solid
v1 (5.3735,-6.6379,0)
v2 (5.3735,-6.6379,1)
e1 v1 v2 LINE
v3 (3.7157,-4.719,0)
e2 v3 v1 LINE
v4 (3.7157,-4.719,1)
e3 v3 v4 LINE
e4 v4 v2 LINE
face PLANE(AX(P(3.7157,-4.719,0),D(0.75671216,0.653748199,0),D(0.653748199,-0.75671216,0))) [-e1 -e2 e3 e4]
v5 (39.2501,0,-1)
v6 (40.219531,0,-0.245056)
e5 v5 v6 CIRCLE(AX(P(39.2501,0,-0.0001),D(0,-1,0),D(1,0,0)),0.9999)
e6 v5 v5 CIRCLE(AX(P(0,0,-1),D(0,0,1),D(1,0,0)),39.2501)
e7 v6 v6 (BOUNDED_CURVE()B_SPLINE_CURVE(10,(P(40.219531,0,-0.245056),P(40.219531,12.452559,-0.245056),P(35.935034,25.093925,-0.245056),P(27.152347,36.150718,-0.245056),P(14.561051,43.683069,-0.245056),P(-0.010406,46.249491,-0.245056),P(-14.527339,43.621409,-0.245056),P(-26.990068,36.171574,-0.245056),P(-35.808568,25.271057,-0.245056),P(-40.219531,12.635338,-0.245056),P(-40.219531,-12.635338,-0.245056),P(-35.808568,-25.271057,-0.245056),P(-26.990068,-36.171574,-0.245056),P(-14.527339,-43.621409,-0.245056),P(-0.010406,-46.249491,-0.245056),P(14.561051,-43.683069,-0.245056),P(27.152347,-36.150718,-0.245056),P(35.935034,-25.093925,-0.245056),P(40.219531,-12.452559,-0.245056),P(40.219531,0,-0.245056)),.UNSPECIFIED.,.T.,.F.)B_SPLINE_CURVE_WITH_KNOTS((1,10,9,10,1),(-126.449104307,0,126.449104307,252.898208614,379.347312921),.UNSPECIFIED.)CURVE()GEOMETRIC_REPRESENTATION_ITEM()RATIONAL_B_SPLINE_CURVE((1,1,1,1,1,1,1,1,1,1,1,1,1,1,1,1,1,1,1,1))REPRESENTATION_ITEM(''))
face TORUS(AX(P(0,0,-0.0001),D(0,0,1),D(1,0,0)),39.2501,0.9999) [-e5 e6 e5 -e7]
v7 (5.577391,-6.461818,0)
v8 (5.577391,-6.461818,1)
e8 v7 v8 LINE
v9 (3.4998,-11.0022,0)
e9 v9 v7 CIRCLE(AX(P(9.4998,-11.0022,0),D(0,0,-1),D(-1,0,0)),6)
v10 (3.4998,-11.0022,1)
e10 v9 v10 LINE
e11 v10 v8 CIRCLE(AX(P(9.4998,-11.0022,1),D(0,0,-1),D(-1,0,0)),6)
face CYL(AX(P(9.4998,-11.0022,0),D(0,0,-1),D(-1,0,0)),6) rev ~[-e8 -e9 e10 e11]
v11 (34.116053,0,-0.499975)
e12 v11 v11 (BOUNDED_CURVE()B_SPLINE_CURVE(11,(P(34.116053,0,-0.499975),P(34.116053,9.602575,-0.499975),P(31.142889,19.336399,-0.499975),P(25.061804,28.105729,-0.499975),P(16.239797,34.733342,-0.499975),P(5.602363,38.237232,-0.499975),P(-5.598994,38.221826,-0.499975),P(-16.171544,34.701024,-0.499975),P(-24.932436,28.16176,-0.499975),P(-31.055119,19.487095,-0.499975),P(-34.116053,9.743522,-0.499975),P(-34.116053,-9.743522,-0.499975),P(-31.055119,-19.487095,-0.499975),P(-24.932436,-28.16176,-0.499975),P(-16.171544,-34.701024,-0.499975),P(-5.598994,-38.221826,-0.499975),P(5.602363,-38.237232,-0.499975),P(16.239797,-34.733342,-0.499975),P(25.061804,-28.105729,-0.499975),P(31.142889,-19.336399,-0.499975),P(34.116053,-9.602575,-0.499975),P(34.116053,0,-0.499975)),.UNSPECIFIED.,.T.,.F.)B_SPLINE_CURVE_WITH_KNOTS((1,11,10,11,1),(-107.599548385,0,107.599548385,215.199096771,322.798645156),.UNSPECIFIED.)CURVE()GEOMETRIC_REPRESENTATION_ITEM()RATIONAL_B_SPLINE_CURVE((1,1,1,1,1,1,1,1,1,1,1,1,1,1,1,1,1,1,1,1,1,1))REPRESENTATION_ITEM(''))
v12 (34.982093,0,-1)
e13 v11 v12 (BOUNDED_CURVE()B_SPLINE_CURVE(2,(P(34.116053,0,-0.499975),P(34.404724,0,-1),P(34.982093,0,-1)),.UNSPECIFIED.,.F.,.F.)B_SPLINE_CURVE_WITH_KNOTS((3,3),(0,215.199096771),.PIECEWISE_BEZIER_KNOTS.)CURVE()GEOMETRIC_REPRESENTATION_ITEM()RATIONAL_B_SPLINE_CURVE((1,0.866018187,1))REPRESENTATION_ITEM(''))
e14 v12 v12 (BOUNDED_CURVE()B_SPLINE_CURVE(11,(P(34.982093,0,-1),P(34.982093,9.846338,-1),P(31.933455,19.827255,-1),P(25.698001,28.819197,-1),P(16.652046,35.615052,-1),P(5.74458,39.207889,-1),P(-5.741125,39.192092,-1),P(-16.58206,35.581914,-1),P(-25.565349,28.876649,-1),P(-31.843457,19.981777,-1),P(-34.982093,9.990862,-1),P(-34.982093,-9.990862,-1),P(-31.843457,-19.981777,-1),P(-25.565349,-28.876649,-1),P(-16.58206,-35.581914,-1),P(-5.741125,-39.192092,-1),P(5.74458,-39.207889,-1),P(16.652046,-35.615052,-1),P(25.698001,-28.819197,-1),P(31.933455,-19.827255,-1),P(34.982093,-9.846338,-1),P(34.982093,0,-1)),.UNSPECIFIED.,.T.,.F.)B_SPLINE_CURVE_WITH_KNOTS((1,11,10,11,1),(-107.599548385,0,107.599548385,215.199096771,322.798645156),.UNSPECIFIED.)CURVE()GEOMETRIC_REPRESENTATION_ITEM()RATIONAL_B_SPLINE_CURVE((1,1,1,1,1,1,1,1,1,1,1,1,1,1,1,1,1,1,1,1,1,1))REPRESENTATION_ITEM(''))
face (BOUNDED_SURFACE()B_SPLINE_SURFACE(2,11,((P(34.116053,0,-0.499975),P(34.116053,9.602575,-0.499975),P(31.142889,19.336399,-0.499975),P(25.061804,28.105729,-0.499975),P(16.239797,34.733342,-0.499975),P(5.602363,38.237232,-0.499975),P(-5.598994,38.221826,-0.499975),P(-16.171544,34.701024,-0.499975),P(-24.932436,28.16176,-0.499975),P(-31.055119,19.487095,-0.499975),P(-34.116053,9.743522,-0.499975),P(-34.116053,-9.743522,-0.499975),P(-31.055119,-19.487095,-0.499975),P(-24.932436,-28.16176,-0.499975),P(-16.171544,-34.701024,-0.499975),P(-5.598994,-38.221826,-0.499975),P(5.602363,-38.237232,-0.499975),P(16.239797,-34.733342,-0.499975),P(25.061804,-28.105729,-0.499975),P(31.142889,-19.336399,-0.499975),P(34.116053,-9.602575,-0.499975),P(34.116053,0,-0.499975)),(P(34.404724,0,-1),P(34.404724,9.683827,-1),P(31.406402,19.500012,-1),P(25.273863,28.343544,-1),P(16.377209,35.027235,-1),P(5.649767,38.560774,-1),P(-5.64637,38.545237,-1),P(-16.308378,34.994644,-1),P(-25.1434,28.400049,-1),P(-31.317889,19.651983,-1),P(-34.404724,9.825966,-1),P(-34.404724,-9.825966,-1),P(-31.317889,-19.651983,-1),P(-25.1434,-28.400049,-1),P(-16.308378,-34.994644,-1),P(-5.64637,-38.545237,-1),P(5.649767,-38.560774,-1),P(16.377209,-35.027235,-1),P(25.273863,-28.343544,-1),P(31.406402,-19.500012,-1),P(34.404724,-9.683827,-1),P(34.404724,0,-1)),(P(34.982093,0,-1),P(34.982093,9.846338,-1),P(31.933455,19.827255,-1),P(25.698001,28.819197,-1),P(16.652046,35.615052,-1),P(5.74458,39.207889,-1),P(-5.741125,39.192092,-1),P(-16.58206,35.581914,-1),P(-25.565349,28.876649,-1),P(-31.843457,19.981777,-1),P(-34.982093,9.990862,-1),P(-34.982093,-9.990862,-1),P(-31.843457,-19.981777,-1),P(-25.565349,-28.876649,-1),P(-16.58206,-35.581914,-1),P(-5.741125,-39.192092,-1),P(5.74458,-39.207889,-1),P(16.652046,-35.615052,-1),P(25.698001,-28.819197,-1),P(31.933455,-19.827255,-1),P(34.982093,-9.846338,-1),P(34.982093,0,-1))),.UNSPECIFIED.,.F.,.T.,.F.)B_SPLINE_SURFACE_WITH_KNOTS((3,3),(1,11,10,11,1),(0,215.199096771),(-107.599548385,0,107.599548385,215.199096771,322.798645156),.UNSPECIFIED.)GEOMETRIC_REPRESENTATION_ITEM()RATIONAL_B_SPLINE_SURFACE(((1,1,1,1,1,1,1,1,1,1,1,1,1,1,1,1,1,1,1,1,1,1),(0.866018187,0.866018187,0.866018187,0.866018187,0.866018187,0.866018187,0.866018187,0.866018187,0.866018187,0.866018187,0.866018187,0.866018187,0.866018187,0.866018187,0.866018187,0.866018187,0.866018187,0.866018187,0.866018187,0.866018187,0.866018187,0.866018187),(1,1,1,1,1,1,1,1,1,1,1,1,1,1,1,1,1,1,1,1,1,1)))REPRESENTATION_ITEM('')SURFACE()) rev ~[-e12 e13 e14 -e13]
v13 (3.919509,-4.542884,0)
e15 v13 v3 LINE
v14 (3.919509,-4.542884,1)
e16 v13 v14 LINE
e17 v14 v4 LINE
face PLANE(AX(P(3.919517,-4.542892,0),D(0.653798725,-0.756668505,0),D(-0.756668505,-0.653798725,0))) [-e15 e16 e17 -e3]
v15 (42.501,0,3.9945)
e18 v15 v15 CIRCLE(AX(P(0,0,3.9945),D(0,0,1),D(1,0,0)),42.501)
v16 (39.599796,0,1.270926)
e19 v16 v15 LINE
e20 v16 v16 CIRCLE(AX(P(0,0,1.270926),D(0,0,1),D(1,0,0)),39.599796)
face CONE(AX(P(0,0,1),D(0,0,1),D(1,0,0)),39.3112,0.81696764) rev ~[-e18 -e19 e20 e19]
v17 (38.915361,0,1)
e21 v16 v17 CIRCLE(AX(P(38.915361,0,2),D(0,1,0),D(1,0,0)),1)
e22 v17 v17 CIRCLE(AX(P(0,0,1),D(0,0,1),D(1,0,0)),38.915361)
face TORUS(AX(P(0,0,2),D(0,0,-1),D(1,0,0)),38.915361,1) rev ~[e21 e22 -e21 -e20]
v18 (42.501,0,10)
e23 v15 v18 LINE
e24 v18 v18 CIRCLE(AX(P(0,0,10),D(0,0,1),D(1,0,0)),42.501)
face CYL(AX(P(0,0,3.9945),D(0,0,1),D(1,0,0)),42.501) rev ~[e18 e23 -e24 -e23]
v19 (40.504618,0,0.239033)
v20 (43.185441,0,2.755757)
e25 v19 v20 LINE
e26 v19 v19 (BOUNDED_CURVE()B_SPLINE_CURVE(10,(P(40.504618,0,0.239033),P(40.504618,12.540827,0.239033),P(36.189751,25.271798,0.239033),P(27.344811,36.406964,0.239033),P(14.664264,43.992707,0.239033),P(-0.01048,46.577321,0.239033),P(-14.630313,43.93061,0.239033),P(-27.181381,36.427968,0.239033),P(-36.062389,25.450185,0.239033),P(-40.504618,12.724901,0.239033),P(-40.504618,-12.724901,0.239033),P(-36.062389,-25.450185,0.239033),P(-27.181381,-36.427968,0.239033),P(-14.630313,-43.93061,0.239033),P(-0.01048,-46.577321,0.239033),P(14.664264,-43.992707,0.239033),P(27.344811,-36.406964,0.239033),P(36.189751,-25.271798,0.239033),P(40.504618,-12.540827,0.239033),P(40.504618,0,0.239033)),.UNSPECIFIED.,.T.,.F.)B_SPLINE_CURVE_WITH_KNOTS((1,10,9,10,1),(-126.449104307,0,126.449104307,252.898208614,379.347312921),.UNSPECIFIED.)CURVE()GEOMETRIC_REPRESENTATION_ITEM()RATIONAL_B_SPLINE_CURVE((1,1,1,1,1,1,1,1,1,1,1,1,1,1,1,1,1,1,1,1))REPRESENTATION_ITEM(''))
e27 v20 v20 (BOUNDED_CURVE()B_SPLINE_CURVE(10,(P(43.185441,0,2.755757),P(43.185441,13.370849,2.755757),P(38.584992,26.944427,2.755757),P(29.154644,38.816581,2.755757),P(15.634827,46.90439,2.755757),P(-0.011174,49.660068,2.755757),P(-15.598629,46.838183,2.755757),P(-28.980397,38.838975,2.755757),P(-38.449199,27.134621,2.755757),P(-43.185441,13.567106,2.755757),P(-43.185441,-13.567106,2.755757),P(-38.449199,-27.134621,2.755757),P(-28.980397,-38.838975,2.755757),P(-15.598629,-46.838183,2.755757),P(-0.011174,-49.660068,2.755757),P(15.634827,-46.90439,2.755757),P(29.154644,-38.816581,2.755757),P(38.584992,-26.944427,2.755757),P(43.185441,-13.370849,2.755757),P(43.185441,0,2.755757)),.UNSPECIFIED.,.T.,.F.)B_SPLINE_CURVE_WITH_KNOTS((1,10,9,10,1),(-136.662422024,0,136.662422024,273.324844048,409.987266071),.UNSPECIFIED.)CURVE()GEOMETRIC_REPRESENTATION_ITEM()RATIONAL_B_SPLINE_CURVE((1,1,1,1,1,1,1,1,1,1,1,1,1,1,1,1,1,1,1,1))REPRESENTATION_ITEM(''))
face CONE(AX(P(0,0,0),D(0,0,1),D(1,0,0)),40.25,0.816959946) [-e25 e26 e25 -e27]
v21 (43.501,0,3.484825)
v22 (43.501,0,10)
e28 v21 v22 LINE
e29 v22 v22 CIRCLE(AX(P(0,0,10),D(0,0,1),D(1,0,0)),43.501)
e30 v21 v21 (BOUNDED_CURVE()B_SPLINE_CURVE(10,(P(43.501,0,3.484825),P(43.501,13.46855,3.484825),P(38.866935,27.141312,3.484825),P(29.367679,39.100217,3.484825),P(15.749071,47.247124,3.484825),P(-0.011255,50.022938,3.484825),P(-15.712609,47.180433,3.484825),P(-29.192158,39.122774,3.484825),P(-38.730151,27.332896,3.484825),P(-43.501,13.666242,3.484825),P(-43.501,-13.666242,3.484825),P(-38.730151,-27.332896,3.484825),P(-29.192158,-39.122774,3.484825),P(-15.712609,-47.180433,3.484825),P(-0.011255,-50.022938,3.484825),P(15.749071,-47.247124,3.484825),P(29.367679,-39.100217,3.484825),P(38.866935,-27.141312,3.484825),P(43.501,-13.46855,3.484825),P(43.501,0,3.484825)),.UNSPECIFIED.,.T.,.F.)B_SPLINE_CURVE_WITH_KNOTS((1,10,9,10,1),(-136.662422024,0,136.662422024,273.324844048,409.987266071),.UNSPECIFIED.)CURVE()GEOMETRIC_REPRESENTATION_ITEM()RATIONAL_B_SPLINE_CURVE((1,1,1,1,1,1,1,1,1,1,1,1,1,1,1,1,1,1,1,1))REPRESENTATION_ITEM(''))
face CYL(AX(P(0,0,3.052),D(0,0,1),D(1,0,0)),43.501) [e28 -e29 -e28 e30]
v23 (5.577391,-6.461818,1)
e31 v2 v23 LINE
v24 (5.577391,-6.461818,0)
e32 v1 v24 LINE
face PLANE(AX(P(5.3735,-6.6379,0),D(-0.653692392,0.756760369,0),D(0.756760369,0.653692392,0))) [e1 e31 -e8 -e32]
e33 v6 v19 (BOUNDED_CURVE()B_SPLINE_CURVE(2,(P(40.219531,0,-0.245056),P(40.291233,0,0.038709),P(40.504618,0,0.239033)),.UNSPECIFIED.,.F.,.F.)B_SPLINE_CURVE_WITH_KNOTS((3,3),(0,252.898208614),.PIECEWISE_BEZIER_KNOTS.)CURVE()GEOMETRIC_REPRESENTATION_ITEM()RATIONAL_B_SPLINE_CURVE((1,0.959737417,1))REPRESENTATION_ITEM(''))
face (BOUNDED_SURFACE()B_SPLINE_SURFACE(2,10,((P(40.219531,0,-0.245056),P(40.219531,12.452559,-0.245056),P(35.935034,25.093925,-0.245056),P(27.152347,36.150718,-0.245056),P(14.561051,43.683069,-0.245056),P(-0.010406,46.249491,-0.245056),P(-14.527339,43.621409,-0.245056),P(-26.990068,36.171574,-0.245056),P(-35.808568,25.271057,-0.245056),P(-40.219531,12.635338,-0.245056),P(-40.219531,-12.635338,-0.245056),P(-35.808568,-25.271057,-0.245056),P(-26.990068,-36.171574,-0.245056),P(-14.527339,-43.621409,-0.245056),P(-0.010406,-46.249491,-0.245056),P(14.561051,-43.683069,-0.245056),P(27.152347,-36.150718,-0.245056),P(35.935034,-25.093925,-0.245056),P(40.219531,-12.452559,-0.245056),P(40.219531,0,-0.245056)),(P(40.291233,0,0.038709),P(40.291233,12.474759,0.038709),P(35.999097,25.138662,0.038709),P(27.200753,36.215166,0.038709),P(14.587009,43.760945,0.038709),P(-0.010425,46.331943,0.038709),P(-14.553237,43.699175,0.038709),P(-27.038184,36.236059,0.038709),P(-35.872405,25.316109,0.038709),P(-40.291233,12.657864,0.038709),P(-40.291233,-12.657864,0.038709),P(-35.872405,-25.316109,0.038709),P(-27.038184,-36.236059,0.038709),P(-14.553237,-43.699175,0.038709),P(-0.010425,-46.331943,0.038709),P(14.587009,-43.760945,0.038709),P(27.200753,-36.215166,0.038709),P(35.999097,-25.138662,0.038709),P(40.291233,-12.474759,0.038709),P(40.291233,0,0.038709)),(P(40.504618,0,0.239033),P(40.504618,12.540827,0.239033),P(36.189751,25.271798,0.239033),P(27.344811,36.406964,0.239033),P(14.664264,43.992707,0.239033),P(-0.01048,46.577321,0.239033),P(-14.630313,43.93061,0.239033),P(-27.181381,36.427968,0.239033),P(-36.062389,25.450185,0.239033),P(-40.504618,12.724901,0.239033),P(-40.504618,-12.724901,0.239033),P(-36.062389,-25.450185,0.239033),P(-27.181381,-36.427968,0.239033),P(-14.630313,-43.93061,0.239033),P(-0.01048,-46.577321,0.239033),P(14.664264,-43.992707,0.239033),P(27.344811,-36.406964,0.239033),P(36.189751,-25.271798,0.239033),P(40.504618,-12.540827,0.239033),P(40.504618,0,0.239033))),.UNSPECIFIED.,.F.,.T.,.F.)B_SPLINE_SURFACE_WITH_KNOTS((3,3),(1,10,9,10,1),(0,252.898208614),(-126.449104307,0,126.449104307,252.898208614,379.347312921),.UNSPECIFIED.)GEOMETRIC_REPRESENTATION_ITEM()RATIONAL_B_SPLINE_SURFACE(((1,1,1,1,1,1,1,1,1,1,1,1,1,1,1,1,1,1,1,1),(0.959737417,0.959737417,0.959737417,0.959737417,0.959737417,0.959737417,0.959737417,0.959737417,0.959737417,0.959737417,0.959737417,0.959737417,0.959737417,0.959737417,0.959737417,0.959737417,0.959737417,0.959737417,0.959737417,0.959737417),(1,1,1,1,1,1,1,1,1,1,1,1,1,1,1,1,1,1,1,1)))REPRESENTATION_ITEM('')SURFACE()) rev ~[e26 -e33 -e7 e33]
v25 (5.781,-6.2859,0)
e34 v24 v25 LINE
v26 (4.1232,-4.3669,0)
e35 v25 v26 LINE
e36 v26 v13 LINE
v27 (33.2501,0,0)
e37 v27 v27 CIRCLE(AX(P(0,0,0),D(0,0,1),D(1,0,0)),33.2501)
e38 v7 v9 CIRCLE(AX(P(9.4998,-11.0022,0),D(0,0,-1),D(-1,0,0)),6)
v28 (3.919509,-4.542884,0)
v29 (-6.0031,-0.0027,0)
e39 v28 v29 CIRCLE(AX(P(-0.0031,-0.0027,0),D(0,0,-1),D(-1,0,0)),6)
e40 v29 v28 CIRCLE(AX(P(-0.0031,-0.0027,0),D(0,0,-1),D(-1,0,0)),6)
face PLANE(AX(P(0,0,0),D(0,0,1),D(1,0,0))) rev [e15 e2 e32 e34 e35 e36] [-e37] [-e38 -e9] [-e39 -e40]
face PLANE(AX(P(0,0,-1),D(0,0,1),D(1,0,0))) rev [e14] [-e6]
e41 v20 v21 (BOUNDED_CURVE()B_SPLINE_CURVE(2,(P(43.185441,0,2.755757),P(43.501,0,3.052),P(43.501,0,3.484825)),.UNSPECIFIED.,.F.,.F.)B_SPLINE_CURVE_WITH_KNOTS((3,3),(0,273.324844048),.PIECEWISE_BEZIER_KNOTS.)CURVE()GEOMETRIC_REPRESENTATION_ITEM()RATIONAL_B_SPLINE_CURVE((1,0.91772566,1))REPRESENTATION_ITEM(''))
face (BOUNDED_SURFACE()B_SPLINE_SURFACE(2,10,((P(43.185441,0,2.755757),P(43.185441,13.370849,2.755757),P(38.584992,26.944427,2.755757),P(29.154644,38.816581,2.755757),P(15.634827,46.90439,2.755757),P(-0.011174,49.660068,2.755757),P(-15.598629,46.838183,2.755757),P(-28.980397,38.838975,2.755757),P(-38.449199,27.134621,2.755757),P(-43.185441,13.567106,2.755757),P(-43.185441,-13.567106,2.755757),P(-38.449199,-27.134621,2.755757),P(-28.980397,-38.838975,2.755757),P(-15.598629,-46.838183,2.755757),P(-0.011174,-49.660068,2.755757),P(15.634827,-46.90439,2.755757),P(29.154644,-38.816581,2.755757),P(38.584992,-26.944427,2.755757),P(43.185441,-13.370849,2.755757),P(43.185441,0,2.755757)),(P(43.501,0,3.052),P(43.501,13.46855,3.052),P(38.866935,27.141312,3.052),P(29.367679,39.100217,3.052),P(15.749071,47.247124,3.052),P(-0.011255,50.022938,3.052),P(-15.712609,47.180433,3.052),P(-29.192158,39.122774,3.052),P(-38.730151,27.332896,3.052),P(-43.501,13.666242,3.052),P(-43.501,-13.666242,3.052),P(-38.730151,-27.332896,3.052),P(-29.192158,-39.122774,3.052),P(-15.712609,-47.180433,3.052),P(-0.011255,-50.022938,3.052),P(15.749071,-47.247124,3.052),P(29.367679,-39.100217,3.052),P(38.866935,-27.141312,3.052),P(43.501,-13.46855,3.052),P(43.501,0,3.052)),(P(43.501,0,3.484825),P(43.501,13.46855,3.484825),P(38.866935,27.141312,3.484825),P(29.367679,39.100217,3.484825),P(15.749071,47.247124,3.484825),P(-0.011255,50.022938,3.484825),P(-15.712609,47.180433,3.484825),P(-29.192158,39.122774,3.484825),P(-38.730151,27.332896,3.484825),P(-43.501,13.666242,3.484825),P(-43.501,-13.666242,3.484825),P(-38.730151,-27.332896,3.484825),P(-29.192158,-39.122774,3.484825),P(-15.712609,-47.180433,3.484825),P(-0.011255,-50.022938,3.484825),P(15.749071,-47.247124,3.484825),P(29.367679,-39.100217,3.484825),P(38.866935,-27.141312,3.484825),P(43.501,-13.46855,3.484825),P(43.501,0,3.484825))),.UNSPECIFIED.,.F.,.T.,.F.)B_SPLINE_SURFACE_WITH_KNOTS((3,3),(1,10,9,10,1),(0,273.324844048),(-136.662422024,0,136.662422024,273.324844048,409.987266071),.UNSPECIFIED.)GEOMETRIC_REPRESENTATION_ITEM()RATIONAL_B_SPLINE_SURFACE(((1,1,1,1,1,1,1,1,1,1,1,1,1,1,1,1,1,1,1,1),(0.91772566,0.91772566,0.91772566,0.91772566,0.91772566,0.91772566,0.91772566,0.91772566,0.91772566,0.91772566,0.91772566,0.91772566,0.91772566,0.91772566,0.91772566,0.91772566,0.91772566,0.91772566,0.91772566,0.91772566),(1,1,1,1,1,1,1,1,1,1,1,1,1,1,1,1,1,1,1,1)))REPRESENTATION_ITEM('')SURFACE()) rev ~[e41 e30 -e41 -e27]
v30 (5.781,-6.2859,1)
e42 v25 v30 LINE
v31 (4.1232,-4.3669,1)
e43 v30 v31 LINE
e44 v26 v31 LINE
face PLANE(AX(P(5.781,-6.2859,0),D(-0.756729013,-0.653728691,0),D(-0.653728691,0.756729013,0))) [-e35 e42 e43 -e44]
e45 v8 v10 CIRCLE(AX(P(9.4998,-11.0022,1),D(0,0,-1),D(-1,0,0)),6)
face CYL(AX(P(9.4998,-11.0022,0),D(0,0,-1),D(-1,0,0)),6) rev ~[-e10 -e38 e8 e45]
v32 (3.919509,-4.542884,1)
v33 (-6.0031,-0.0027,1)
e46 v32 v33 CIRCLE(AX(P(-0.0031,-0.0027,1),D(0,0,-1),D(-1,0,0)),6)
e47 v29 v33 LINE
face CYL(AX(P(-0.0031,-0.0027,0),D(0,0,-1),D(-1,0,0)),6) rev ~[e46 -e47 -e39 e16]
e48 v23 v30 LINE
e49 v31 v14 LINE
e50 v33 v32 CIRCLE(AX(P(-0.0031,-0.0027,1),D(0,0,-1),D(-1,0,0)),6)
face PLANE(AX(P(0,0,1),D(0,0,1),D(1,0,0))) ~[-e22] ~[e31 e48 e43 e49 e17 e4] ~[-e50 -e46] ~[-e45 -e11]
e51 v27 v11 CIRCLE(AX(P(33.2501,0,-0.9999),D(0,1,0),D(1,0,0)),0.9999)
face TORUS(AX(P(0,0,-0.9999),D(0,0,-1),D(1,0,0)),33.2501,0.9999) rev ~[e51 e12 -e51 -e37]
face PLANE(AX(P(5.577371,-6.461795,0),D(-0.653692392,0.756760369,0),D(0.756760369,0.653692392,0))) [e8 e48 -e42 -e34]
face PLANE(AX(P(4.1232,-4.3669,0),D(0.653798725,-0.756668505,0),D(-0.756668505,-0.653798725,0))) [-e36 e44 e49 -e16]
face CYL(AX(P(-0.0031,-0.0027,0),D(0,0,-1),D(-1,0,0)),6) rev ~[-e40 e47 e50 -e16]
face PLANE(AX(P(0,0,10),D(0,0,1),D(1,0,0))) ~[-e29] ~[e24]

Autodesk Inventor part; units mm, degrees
ref_plane "YZ Plane" through (0, 0, 0) normal (1, 0, 0) x (0, 1, 0)
ref_plane "XZ Plane" through (0, 0, 0) normal (0, 1, 0) x (-1, 0, 0)
ref_plane "XY Plane" through (0, 0, 0) normal (0, 0, 1) x (1, 0, 0)
sketch "Skizze1" plane through (0, 0, 0) normal (0, 1, 0) x (-1, 0, 0)
  line L0 (0, 0) -> (-34.25, 0)
  line L1 (-34.25, 0) -> (-34.25, -1)
  line L2 (-34.25, -1) -> (-40.25, -1)
  line L3 (-40.25, -1) -> (-40.25, 0)
  line L4 (-40.25, 0) -> (-43.501, 3.052)
  line L5 (-43.501, 3.052) -> (-43.501, 10)
  line L6 (0, 0) -> (0, 1)
  line L7 (0, 1) -> (-39.3112, 1)
  line L8 (-39.3112, 1) -> (-42.501, 3.9945)
  line L9 (-42.501, 3.9945) -> (-42.501, 10)
  line L10 (-42.501, 10) -> (-43.501, 10)
  dimension "d0" = 34.25
  dimension "d1" = 1
  dimension "d2" = 6
  dimension "d3" = 10
  dimension "d4" = 1
  dimension "d5" = 1
revolve "Umdrehung1" add sketch "Skizze1" angle 360 about axis through (0, 0, 0) along (0, 0, 1)
fillet "Rundung1" radius 1 6 edges at (-34.25, 0, 0) (-34.25, 0, -1) (-40.25, 0, -1) (-40.25, 0, 0) (-43.501, 0, 3.052) (-39.3112, 0, 1)
sketch "Skizze2" plane through (0, 0, 0) normal (0, 0, -1) x (-1, 0, 0)
  circle A0 centre (0.0031, -0.0027) radius 3 projected
  arc A1 (-12.0467, -11.77) -> (-7.3029, -12.5022) centre (-9.4998, -11.0022) ccw projected
  circle A2 centre (0.0031, -0.0027) radius 6
  circle A3 centre (-9.4998, -11.0022) radius 6
  line L0 (0.0031, -0.0027) -> (-9.4998, -11.0022)
  line L1 (-5.781, -6.2859) -> (-4.1232, -4.3669)
  line L2 (-4.1232, -4.3669) -> (-3.7157, -4.719)
  line L3 (-3.7157, -4.719) -> (-5.3735, -6.6379)
  line L4 (-5.3735, -6.6379) -> (-5.781, -6.2859)
  line L5 (-5.781, -6.2859) -> (-3.7157, -4.719) construction
  line L6 (-4.1232, -4.3669) -> (-5.3735, -6.6379) construction
  point P0 (0, 0)
  point P1 (-4.7484, -5.5024)
  point P2 (-5.5773, -6.4619)
  point P3 (-3.9194, -4.543)
  dimension "d8" = 12
  dimension "d9" = 12
extrude "Extrusion1" cut sketch "Skizze2" against normal blind 10 contours A0 | A2 | A3 | L2 L3 L4 L0 | L0 L4 L1 L2
ref_plane "Arbeitsebene1" through (3.9194, -4.543, 0) normal (-0.7567077, -0.6537534, 0) x (0, 0, 1)
equation "\"Biegeradius\" = Stärke"
equation "\"BreiteBiegungsfreistellung\" = Stärke"
equation "\"TiefeBiegungsfreistellung\" = 0.5 * Stärke"
equation "\"GrößeEckenfreistellung\" = 4 * Stärke"
equation "\"MinimalRest\" = 2 * Stärke"
equation "\"Übergangsradius\" = Biegeradius"
equation "\"JacobiRadiusGröße\" = Biegeradius"
equation "\"Abstandsgröße\" = Stärke"
equation "\"Stärke\" = 3.048"
properties part number "00_Lid_Bonne_Mamman"
